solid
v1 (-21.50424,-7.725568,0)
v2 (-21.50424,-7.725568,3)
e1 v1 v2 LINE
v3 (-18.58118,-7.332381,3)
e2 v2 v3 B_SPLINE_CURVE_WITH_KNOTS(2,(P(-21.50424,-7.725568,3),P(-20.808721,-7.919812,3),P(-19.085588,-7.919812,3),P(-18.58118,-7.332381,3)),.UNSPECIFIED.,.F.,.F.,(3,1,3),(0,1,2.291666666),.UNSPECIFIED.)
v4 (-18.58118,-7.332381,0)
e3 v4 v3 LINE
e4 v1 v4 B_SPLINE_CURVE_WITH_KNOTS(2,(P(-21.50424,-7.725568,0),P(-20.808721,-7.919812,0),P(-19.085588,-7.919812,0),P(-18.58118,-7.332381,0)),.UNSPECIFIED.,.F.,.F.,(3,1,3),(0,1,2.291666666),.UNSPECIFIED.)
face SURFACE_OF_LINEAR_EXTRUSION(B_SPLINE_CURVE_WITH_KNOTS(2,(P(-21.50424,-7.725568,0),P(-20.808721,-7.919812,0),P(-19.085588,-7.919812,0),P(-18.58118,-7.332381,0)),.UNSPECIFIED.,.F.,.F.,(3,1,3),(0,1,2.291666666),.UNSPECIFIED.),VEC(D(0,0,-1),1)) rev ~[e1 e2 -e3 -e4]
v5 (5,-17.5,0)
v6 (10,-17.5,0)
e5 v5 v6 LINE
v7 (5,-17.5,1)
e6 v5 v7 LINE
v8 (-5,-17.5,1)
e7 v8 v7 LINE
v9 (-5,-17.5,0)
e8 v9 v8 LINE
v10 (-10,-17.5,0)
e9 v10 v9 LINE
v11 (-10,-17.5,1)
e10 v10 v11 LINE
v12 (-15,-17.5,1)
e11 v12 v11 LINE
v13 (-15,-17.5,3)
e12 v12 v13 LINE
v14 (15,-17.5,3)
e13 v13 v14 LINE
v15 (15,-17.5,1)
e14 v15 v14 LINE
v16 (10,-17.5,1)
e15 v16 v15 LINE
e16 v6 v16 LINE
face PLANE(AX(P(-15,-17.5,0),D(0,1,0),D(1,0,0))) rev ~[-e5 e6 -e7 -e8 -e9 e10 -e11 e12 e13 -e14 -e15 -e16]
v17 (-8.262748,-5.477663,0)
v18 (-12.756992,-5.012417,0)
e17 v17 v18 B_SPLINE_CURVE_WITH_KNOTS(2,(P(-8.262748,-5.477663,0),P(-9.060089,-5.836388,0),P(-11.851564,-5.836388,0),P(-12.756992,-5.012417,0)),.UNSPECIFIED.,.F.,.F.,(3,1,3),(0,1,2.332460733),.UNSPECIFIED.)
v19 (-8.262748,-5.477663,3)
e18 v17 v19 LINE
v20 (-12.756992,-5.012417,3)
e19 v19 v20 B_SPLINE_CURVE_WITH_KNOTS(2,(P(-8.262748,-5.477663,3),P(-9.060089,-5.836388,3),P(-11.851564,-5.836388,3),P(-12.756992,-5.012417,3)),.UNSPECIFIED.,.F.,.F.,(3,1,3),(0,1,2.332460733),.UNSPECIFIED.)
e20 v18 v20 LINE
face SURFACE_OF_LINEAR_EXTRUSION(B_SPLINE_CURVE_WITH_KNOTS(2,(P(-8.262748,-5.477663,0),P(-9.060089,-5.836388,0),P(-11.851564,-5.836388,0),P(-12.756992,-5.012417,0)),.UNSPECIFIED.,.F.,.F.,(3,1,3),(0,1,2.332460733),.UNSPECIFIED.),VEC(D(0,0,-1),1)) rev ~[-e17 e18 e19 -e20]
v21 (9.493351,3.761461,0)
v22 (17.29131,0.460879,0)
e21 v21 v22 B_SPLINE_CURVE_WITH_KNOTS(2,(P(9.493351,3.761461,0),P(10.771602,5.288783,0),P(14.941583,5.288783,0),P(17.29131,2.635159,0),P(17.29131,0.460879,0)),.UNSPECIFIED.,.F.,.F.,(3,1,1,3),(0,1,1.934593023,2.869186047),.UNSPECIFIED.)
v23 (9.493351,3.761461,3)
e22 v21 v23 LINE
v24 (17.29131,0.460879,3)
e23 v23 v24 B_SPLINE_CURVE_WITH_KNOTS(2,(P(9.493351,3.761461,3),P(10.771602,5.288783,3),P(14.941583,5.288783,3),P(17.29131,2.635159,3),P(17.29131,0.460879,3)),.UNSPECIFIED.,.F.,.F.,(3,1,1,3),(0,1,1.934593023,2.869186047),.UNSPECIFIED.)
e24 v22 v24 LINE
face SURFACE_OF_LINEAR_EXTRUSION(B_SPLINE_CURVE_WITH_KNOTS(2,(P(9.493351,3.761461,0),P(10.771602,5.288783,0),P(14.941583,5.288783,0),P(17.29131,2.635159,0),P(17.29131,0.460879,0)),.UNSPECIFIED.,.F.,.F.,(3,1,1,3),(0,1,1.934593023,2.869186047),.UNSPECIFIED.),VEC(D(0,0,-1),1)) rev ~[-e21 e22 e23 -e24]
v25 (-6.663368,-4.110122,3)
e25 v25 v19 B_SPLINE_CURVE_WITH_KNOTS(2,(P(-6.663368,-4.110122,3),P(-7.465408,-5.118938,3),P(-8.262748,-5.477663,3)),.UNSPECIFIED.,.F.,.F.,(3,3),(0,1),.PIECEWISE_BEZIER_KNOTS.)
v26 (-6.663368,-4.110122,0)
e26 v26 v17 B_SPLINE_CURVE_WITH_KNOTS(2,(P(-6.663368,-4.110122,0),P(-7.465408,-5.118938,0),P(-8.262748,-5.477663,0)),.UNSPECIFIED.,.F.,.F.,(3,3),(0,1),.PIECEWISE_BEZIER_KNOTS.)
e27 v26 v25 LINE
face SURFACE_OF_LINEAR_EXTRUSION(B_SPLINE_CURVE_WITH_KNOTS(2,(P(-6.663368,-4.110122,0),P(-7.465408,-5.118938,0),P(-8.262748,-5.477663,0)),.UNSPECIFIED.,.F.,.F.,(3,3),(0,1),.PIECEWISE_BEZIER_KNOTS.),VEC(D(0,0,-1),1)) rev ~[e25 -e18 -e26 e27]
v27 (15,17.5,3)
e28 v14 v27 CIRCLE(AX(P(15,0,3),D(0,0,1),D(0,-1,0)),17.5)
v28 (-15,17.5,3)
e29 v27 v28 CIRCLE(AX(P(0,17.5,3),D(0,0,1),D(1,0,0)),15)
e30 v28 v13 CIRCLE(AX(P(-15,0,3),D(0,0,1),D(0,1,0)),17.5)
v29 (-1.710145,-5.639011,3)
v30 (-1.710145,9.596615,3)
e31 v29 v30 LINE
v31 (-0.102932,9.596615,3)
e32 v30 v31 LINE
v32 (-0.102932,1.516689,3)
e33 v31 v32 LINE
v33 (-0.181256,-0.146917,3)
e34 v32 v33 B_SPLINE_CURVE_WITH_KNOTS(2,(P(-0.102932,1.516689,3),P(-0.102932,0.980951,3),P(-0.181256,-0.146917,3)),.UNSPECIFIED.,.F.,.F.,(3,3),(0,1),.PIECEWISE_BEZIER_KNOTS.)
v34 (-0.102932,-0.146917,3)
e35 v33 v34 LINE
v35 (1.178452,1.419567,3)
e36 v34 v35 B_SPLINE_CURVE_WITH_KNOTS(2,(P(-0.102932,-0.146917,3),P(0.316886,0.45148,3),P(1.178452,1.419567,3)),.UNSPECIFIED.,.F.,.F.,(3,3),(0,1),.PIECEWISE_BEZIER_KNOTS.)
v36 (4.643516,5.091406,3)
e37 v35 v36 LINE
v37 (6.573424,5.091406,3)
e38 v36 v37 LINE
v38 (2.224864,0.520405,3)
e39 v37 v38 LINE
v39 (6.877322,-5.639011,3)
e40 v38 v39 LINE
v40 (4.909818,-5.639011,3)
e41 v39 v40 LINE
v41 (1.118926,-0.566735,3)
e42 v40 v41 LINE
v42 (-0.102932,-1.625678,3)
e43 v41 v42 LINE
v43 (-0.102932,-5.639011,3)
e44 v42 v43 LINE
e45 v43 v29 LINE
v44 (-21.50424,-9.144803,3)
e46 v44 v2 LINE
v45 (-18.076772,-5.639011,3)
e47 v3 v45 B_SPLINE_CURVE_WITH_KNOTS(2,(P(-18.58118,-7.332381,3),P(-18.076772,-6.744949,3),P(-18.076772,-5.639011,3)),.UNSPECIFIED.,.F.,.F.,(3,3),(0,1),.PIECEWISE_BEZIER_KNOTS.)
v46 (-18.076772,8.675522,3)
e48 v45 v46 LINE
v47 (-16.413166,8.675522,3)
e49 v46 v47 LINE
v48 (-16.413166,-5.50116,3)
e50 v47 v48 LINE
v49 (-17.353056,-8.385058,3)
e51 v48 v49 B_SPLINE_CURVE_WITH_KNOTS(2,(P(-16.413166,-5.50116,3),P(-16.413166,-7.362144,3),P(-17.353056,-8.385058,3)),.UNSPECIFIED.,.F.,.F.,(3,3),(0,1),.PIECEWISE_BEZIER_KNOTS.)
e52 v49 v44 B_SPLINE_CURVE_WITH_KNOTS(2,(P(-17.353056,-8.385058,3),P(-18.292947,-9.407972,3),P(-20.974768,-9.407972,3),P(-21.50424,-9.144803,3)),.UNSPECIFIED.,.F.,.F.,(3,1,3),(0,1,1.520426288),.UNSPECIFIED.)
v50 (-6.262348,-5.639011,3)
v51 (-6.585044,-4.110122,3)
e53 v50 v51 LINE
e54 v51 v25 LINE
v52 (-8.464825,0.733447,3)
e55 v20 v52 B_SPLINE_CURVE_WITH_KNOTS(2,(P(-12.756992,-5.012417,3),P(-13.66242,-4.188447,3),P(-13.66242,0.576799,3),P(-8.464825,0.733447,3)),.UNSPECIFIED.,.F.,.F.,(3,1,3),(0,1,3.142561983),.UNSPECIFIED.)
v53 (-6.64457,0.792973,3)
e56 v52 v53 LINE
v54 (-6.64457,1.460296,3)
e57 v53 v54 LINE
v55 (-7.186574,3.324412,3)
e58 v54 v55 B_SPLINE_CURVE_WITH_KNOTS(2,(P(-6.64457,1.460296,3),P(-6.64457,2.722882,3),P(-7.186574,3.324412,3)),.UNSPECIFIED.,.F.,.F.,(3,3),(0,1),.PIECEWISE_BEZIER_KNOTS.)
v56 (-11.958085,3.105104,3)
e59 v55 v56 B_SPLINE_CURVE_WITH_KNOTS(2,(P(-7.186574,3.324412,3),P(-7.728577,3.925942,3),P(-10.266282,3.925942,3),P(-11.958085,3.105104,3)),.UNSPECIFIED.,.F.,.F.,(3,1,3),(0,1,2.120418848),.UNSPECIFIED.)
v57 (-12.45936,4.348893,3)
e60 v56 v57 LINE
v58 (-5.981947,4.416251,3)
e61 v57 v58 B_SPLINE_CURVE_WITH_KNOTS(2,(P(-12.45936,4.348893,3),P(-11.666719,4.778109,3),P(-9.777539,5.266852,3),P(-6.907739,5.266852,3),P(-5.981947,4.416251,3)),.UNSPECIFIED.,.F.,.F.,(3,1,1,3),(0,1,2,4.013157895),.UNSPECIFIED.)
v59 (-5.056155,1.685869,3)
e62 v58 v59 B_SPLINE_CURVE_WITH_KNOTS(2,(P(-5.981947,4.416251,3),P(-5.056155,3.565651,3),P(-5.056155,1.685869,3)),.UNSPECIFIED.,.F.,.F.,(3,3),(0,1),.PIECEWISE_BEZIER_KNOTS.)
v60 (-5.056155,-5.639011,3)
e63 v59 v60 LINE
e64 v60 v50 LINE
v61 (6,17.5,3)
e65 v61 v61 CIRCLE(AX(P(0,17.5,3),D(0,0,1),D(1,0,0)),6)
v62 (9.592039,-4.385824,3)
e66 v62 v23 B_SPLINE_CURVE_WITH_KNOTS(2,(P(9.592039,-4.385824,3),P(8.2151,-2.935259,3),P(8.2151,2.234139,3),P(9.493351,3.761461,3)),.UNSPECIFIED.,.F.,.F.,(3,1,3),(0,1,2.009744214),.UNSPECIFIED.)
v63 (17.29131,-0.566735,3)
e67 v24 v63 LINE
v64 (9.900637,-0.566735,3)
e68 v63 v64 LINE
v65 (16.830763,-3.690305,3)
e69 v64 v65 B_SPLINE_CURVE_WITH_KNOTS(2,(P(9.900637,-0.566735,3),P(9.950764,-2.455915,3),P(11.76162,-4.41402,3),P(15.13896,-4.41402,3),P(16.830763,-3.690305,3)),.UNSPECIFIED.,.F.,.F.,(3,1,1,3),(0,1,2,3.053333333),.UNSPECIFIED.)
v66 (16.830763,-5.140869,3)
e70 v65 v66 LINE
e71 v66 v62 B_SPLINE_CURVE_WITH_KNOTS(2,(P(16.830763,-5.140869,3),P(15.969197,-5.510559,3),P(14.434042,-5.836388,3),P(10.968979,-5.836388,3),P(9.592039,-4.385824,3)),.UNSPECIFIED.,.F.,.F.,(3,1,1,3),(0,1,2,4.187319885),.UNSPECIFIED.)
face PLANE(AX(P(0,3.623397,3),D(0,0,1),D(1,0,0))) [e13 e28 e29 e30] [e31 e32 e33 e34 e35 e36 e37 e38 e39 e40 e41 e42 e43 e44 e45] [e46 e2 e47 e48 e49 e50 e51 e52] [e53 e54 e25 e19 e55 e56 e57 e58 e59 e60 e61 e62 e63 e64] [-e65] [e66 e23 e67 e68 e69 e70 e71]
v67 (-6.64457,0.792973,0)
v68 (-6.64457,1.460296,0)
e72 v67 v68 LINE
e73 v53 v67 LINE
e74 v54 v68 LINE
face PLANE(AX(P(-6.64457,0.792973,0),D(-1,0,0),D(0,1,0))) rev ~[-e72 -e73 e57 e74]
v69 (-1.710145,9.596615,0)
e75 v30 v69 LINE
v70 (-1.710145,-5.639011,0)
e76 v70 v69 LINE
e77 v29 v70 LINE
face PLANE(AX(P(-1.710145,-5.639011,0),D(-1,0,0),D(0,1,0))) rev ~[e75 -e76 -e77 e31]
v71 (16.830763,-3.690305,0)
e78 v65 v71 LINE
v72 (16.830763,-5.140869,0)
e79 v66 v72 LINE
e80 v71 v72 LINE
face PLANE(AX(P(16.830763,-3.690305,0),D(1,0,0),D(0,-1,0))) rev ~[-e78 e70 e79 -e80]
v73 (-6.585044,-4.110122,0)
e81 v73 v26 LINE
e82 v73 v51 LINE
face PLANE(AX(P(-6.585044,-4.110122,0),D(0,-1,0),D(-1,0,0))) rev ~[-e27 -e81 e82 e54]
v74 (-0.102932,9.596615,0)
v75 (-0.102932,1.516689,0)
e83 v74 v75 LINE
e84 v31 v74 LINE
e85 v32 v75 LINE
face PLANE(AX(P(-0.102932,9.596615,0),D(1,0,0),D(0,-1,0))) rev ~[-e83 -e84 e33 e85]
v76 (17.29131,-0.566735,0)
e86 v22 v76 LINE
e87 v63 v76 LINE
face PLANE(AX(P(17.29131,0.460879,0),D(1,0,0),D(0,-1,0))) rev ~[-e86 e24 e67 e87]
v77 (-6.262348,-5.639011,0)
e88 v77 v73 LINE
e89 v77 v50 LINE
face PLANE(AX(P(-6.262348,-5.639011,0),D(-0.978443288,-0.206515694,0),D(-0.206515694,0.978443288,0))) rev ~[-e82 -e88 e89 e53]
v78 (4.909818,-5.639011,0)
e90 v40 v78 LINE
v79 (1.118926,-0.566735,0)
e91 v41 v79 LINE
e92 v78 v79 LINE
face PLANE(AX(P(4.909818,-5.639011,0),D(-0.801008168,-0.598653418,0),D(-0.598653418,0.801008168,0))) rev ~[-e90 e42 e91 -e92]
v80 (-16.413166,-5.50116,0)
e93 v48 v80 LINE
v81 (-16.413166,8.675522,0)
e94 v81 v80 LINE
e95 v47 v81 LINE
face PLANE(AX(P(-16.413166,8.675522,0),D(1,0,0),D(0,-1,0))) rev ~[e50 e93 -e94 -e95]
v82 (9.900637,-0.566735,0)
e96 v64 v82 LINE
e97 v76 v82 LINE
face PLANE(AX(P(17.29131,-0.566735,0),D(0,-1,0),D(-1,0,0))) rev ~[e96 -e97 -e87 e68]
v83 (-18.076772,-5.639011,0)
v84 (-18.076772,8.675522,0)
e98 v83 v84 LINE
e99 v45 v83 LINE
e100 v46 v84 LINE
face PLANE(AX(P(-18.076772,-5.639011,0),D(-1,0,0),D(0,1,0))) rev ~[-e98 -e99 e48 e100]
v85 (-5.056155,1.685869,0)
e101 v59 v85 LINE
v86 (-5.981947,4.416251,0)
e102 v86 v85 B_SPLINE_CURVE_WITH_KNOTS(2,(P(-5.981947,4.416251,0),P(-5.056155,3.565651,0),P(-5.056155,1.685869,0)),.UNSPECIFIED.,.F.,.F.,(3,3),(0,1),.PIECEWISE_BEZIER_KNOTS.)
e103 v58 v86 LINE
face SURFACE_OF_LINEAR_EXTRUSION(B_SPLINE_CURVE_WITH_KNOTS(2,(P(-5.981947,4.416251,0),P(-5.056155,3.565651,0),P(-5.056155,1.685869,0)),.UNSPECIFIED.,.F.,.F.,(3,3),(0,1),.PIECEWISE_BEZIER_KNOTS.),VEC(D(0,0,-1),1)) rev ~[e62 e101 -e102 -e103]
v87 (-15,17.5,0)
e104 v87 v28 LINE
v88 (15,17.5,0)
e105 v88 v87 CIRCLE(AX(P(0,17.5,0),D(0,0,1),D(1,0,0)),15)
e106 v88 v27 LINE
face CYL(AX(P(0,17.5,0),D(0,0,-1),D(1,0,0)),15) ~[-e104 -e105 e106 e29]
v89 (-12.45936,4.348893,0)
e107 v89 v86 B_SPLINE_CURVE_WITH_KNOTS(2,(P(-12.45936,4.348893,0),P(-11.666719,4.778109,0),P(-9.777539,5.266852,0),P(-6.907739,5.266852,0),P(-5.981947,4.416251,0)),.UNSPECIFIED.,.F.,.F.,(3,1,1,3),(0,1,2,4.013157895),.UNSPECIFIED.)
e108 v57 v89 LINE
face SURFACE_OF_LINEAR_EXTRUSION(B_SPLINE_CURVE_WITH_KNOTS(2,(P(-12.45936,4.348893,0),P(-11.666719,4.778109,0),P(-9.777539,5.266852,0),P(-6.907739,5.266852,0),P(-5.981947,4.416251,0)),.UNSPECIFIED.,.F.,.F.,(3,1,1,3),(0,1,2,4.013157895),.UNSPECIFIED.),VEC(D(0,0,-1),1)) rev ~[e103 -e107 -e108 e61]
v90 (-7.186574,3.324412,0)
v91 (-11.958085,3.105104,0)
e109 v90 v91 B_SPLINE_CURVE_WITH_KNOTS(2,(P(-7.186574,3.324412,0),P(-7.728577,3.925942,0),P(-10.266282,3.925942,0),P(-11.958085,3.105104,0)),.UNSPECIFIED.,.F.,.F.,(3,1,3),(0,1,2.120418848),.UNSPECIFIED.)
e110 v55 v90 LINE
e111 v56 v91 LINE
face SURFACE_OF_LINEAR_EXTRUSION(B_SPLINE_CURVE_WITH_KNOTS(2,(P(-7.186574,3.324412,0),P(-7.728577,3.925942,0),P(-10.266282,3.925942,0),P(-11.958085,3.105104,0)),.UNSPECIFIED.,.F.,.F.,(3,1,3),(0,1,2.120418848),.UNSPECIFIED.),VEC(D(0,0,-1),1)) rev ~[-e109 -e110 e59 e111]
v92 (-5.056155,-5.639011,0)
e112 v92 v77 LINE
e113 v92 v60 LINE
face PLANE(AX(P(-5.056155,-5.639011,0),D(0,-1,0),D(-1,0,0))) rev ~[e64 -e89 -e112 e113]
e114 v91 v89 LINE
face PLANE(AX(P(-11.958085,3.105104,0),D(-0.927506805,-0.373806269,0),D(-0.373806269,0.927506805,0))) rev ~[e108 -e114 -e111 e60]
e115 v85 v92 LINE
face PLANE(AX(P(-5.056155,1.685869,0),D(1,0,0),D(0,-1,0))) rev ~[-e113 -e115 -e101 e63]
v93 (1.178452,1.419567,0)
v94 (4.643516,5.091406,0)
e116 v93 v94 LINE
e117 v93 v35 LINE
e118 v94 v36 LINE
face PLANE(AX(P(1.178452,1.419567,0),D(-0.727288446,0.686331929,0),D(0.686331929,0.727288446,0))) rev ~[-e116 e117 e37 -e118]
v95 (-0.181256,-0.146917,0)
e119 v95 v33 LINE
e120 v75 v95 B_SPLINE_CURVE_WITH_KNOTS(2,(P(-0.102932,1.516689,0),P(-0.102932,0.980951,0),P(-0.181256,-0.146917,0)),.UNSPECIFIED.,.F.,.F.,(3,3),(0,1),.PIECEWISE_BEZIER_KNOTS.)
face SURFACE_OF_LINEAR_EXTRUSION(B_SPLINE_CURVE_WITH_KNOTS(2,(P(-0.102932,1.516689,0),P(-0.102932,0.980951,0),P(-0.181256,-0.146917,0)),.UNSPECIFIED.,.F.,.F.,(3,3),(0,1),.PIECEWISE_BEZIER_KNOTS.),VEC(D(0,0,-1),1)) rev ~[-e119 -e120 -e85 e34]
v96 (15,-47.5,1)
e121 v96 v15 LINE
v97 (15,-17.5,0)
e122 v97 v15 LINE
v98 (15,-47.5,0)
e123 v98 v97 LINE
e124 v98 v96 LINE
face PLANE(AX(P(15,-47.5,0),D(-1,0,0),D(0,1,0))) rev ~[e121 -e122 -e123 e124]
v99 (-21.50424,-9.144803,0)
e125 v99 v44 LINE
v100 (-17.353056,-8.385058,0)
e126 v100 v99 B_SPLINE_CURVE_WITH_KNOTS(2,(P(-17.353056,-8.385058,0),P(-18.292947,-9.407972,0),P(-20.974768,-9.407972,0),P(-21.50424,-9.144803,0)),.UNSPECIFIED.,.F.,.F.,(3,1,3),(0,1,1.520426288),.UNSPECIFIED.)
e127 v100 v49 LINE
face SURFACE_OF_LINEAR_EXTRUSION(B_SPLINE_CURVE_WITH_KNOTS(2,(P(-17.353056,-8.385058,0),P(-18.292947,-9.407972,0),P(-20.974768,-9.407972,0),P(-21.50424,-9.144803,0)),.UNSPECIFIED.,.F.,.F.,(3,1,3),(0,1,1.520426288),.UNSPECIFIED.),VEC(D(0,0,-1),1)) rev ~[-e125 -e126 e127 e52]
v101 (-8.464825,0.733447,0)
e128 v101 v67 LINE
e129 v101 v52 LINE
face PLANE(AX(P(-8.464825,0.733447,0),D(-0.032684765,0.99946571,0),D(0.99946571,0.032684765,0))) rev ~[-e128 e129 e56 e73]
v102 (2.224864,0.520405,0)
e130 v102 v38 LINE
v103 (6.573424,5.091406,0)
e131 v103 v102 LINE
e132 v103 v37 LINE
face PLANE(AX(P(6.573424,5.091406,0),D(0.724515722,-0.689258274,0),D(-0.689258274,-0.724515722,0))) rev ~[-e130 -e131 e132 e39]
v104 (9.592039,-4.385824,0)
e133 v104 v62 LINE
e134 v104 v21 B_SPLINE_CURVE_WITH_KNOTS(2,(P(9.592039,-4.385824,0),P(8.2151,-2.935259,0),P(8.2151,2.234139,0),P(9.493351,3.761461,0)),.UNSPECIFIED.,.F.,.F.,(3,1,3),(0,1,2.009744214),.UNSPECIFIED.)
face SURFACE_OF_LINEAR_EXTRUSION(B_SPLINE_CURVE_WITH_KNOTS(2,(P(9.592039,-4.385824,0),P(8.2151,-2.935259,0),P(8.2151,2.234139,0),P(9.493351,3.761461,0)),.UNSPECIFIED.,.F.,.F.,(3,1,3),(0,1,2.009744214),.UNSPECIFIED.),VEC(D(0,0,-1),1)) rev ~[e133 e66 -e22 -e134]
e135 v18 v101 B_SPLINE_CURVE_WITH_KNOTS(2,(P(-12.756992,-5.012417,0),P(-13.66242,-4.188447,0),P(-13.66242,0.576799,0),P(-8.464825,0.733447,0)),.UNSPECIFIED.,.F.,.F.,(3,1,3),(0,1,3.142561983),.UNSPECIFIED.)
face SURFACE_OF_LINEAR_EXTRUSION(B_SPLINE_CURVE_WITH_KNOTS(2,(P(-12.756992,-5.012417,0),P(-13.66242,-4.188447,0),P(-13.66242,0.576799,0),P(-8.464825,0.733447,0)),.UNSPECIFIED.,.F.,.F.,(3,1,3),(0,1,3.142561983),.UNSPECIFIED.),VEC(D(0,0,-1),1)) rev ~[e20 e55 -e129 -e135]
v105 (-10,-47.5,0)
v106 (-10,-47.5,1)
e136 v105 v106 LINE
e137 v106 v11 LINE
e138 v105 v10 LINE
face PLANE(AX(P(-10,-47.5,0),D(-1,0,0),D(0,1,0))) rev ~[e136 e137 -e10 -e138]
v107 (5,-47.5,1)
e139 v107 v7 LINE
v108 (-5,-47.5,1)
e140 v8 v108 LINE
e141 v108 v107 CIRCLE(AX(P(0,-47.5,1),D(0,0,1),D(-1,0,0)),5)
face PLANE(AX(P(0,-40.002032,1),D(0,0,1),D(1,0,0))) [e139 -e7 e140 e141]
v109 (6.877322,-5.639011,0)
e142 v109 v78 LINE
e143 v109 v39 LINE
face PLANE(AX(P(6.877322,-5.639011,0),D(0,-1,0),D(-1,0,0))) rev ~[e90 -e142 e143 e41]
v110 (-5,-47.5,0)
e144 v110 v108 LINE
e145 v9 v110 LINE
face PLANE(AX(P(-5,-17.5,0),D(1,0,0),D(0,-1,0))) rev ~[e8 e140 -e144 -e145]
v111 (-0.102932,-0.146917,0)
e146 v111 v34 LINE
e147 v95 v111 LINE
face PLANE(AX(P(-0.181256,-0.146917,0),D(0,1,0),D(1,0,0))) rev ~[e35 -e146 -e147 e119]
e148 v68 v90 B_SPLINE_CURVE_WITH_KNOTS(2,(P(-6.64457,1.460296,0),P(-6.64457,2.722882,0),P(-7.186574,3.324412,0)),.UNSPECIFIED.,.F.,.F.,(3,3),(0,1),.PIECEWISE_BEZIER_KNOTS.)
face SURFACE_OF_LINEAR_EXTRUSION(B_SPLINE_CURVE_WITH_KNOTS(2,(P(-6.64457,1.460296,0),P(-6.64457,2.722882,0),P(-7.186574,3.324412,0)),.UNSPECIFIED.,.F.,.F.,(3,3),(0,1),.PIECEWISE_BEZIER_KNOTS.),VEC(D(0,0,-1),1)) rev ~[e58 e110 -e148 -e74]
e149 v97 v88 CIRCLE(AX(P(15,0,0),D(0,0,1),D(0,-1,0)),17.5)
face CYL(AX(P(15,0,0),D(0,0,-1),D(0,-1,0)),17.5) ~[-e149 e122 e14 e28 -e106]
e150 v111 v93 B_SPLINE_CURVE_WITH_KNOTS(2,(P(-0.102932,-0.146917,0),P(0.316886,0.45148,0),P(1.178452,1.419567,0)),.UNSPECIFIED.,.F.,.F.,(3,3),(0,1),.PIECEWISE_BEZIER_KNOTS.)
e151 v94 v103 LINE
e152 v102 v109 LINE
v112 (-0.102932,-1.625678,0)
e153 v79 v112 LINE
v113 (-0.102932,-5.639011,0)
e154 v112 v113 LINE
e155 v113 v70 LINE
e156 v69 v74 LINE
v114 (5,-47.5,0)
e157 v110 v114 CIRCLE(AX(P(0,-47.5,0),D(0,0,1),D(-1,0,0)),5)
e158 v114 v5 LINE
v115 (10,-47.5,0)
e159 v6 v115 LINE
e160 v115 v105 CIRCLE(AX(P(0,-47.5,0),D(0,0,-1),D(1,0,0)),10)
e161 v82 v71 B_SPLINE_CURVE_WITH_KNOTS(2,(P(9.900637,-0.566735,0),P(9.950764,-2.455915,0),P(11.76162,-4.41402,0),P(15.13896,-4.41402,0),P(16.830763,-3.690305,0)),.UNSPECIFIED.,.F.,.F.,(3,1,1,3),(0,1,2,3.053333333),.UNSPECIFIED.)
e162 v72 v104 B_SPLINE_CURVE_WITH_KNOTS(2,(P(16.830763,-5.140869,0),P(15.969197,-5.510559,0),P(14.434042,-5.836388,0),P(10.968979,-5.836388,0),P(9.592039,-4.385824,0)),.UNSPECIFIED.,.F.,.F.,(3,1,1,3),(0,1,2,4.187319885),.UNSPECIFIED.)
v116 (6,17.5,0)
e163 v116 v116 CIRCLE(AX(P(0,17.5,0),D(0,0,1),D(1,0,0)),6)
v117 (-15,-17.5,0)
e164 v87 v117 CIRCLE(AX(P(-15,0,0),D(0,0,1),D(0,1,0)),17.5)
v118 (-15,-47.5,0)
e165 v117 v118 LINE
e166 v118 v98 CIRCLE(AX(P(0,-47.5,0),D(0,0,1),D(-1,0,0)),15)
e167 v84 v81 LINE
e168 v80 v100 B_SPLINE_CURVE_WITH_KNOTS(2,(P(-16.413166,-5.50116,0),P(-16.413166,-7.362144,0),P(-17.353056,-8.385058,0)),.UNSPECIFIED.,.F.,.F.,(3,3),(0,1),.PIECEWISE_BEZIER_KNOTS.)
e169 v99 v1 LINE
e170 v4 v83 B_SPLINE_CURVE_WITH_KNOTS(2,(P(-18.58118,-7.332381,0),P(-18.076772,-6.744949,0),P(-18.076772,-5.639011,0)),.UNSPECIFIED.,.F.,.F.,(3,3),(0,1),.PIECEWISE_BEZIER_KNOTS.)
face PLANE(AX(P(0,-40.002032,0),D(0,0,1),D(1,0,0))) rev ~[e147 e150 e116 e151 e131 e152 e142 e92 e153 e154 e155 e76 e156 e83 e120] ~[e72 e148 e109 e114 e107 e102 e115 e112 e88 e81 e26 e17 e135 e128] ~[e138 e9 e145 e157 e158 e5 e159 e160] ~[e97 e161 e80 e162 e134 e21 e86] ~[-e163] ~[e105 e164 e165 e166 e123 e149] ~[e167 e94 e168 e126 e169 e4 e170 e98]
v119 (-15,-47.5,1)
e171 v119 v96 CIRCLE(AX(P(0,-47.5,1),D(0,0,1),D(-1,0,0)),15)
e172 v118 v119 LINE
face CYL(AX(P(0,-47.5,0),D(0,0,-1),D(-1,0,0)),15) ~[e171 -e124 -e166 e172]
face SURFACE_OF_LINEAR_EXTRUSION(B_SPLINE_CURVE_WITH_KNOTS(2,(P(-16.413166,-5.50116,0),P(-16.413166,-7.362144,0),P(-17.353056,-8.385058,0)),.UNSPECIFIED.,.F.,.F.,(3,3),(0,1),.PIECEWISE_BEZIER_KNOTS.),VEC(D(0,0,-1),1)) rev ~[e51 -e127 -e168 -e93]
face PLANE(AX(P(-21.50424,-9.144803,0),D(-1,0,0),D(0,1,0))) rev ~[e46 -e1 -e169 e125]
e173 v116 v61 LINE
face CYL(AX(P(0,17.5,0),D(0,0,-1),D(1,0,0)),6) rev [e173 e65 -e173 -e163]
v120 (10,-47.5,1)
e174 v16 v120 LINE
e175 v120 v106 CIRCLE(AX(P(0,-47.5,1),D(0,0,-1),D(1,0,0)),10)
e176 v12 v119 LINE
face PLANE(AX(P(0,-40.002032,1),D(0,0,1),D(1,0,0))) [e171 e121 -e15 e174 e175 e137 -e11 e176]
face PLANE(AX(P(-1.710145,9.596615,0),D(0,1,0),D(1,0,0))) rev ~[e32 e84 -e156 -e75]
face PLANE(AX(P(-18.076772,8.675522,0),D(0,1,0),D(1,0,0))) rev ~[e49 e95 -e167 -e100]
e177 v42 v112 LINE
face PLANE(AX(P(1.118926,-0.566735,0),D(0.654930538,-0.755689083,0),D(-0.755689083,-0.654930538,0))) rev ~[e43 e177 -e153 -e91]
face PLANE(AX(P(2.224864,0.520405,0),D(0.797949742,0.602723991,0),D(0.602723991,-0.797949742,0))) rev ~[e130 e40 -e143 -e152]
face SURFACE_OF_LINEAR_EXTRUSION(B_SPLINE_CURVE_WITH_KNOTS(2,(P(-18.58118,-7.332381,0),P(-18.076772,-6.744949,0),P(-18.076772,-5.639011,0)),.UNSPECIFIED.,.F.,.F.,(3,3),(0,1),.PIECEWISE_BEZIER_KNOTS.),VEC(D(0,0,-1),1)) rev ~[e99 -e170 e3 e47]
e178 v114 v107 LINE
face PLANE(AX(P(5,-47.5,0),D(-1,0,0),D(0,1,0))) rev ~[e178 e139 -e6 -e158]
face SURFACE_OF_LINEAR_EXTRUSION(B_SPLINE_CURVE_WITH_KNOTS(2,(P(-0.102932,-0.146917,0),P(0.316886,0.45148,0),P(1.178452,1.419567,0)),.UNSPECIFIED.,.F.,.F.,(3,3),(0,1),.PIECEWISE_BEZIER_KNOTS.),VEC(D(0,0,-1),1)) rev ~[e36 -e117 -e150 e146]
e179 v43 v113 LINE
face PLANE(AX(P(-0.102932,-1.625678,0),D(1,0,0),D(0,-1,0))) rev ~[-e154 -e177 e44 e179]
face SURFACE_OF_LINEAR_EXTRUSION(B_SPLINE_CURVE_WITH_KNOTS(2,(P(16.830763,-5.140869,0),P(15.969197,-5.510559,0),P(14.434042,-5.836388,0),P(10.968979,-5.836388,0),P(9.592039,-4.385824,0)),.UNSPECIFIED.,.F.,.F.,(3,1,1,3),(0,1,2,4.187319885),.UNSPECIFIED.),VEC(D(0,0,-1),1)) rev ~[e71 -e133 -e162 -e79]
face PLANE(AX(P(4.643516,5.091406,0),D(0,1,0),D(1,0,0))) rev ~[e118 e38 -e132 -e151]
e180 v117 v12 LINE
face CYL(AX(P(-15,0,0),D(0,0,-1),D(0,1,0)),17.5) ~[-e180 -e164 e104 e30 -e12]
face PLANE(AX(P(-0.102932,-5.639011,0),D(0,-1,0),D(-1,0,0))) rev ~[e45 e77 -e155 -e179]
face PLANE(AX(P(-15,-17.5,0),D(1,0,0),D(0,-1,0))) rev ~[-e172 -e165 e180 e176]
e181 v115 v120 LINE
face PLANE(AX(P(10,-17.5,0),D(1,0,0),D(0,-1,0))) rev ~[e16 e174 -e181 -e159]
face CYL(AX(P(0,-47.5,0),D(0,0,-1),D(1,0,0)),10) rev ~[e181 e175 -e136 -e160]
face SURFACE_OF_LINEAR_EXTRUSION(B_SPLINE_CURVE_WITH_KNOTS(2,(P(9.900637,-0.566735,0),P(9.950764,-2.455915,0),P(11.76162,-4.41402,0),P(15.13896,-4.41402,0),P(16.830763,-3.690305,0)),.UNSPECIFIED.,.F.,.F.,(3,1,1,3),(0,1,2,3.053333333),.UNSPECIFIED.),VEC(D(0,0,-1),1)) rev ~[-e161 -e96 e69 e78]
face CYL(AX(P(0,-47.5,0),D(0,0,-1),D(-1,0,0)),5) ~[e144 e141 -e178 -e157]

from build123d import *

# Parameters (mm, degrees)
F0_R     = 6
F1_DEPTH = 3
F2_DEPTH = 1


with BuildPart() as f1:
    # F0 (on Top) → F1 (new body)
    with BuildSketch(Plane.XY):
        with BuildLine():
            Line((10, -17.5), (15, -17.5))
            ThreePointArc((15, -17.5), (32.5, 0), (15, 17.5))
            ThreePointArc((15, 17.5), (0, 32.5), (-15, 17.5))
            ThreePointArc((-15, 17.5), (-32.5, 0), (-15, -17.5))
            Line((-15, -17.5), (-10, -17.5))
            Line((-10, -17.5), (-5, -17.5))
            Line((-5, -17.5), (5, -17.5))
            Line((5, -17.5), (10, -17.5))
        make_face()
        with BuildLine():
            add(Edge.make_bspline(
                [(-17.3530564989, -8.385057961), (-18.2929470593, -9.4079721875), (-20.0568083443, -9.4079721875)],
                knots=[0, 0, 0, 1, 1, 1], degree=2))
            add(Edge.make_bspline(
                [(-20.0568083443, -9.4079721875), (-20.974768125, -9.4079721875), (-21.5042398074, -9.1448028306)],
                knots=[0, 0, 0, 1, 1, 1], degree=2))
            Line((-21.5042398074, -9.1448028306), (-21.5042398074, -7.7255680844))
            add(Edge.make_bspline(
                [(-21.5042398074, -7.7255680844), (-20.8087207927, -7.9198121336), (-20.0568083443, -7.9198121336)],
                knots=[0, 0, 0, 1, 1, 1], degree=2))
            add(Edge.make_bspline(
                [(-20.0568083443, -7.9198121336), (-19.0855880986, -7.9198121336), (-18.5811801645, -7.3323805333)],
                knots=[0, 0, 0, 1, 1, 1], degree=2))
            add(Edge.make_bspline(
                [(-18.5811801645, -7.3323805333), (-18.0767722304, -6.7449489331), (-18.0767722304, -5.6390110403)],
                knots=[0, 0, 0, 1, 1, 1], degree=2))
            Line((-18.0767722304, -5.6390110403), (-18.0767722304, 8.6755221946))
            Line((-18.0767722304, 8.6755221946), (-16.4131659385, 8.6755221946))
            Line((-16.4131659385, 8.6755221946), (-16.4131659385, -5.5011604248))
            add(Edge.make_bspline(
                [(-16.4131659385, -5.5011604248), (-16.4131659385, -7.3621437344), (-17.3530564989, -8.385057961)],
                knots=[0, 0, 0, 1, 1, 1], degree=2))
        make_face(mode=Mode.SUBTRACT)
        with BuildLine():
            Line((-5.0561550003, -5.6390110403), (-6.2623478861, -5.6390110403))
            Line((-6.2623478861, -5.6390110403), (-6.5850436452, -4.1101223954))
            Line((-6.5850436452, -4.1101223954), (-6.6633678586, -4.1101223954))
            add(Edge.make_bspline(
                [(-6.6633678586, -4.1101223954), (-7.4654078035, -5.1189382636), (-8.2627482955, -5.4776631608)],
                knots=[0, 0, 0, 1, 1, 1], degree=2))
            add(Edge.make_bspline(
                [(-8.2627482955, -5.4776631608), (-9.0600887876, -5.836388058), (-10.2568827679, -5.836388058)],
                knots=[0, 0, 0, 1, 1, 1], degree=2))
            add(Edge.make_bspline(
                [(-10.2568827679, -5.836388058), (-11.851563752, -5.836388058), (-12.7569916585, -5.0124173334)],
                knots=[0, 0, 0, 1, 1, 1], degree=2))
            add(Edge.make_bspline(
                [(-12.7569916585, -5.0124173334), (-13.6624195651, -4.1884466088), (-13.6624195651, -2.672089838)],
                knots=[0, 0, 0, 1, 1, 1], degree=2))
            add(Edge.make_bspline(
                [(-13.6624195651, -2.672089838), (-13.6624195651, 0.5767985325), (-8.464824766, 0.7334469592)],
                knots=[0, 0, 0, 1, 1, 1], degree=2))
            Line((-8.464824766, 0.7334469592), (-6.6445700474, 0.7929733614))
            Line((-6.6445700474, 0.7929733614), (-6.6445700474, 1.4602956592))
            add(Edge.make_bspline(
                [(-6.6445700474, 1.4602956592), (-6.6445700474, 2.7228819787), (-7.1865736039, 3.3244119374)],
                knots=[0, 0, 0, 1, 1, 1], degree=2))
            add(Edge.make_bspline(
                [(-7.1865736039, 3.3244119374), (-7.7285771604, 3.925941896), (-8.9253711406, 3.925941896)],
                knots=[0, 0, 0, 1, 1, 1], degree=2))
            add(Edge.make_bspline(
                [(-8.9253711406, 3.925941896), (-10.2662816735, 3.925941896), (-11.9580846822, 3.10510414)],
                knots=[0, 0, 0, 1, 1, 1], degree=2))
            Line((-11.9580846822, 3.10510414), (-12.4593596477, 4.3488926482))
            add(Edge.make_bspline(
                [(-12.4593596477, 4.3488926482), (-11.6667186085, 4.7781093375), (-10.7221285953, 5.0224808832)],
                knots=[0, 0, 0, 1, 1, 1], degree=2))
            add(Edge.make_bspline(
                [(-10.7221285953, 5.0224808832), (-9.7775385821, 5.2668524289), (-8.8251161475, 5.2668524289)],
                knots=[0, 0, 0, 1, 1, 1], degree=2))
            add(Edge.make_bspline(
                [(-8.8251161475, 5.2668524289), (-6.9077394043, 5.2668524289), (-5.9819472023, 4.4162514717)],
                knots=[0, 0, 0, 1, 1, 1], degree=2))
            add(Edge.make_bspline(
                [(-5.9819472023, 4.4162514717), (-5.0561550003, 3.5656505146), (-5.0561550003, 1.6858693937)],
                knots=[0, 0, 0, 1, 1, 1], degree=2))
            Line((-5.0561550003, 1.6858693937), (-5.0561550003, -5.6390110403))
        make_face(mode=Mode.SUBTRACT)
        with BuildLine():
            Line((-0.1812559603, -0.146917199), (-0.102931747, -0.146917199))
            add(Edge.make_bspline(
                [(-0.102931747, -0.146917199), (0.3168860367, 0.4514797911), (1.1784523837, 1.4195670683)],
                knots=[0, 0, 0, 1, 1, 1], degree=2))
            Line((1.1784523837, 1.4195670683), (4.6435155831, 5.0914061909))
            Line((4.6435155831, 5.0914061909), (6.5734242004, 5.0914061909))
            Line((6.5734242004, 5.0914061909), (2.2248638743, 0.5204050988))
            Line((2.2248638743, 0.5204050988), (6.8773221483, -5.6390110403))
            Line((6.8773221483, -5.6390110403), (4.9098179085, -5.6390110403))
            Line((4.9098179085, -5.6390110403), (1.1189259815, -0.5667349827))
            Line((1.1189259815, -0.5667349827), (-0.102931747, -1.6256783474))
            Line((-0.102931747, -1.6256783474), (-0.102931747, -5.6390110403))
            Line((-0.102931747, -5.6390110403), (-1.7101446053, -5.6390110403))
            Line((-1.7101446053, -5.6390110403), (-1.7101446053, 9.5966149438))
            Line((-1.7101446053, 9.5966149438), (-0.102931747, 9.5966149438))
            Line((-0.102931747, 9.5966149438), (-0.102931747, 1.5166890929))
            add(Edge.make_bspline(
                [(-0.102931747, 1.5166890929), (-0.102931747, 0.9809514734), (-0.1812559603, -0.146917199)],
                knots=[0, 0, 0, 1, 1, 1], degree=2))
        make_face(mode=Mode.SUBTRACT)
        with BuildLine():
            add(Edge.make_bspline(
                [(15.2016195449, -5.6734736942), (14.4340422539, -5.836388058), (13.3469021724, -5.836388058)],
                knots=[0, 0, 0, 1, 1, 1], degree=2))
            add(Edge.make_bspline(
                [(13.3469021724, -5.836388058), (10.9689790546, -5.836388058), (9.5920393836, -4.3858236265)],
                knots=[0, 0, 0, 1, 1, 1], degree=2))
            add(Edge.make_bspline(
                [(9.5920393836, -4.3858236265), (8.2150997126, -2.9352591949), (8.2150997126, -0.3630920279)],
                knots=[0, 0, 0, 1, 1, 1], degree=2))
            add(Edge.make_bspline(
                [(8.2150997126, -0.3630920279), (8.2150997126, 2.2341388873), (9.4933508747, 3.761461048)],
                knots=[0, 0, 0, 1, 1, 1], degree=2))
            add(Edge.make_bspline(
                [(9.4933508747, 3.761461048), (10.7716020369, 5.2887832086), (12.9270843887, 5.2887832086)],
                knots=[0, 0, 0, 1, 1, 1], degree=2))
            add(Edge.make_bspline(
                [(12.9270843887, 5.2887832086), (14.9415831565, 5.2887832086), (16.116446357, 3.9619710342)],
                knots=[0, 0, 0, 1, 1, 1], degree=2))
            add(Edge.make_bspline(
                [(16.116446357, 3.9619710342), (17.2913095575, 2.6351588598), (17.2913095575, 0.4608786967)],
                knots=[0, 0, 0, 1, 1, 1], degree=2))
            Line((17.2913095575, 0.4608786967), (17.2913095575, -0.5667349827))
            Line((17.2913095575, -0.5667349827), (9.9006367842, -0.5667349827))
            add(Edge.make_bspline(
                [(9.9006367842, -0.5667349827), (9.9507642808, -2.4559150091), (10.8561921873, -3.4349676762)],
                knots=[0, 0, 0, 1, 1, 1], degree=2))
            add(Edge.make_bspline(
                [(10.8561921873, -3.4349676762), (11.7616200938, -4.4140203433), (13.4064285746, -4.4140203433)],
                knots=[0, 0, 0, 1, 1, 1], degree=2))
            add(Edge.make_bspline(
                [(13.4064285746, -4.4140203433), (15.1389601742, -4.4140203433), (16.830763183, -3.6903046118)],
                knots=[0, 0, 0, 1, 1, 1], degree=2))
            Line((16.830763183, -3.6903046118), (16.830763183, -5.1408690433))
            add(Edge.make_bspline(
                [(16.830763183, -5.1408690433), (15.9691968359, -5.5105593304), (15.2016195449, -5.6734736942)],
                knots=[0, 0, 0, 1, 1, 1], degree=2))
        make_face(mode=Mode.SUBTRACT)
        with Locations((0, 17.5)):
            Circle(F0_R, mode=Mode.SUBTRACT)
    extrude(amount=F1_DEPTH)

    # F0 (on Top) → F2 (join)
    with BuildSketch(Plane.XY):
        with BuildLine():
            Line((15, -47.5), (15, -17.5))
            Line((15, -17.5), (10, -17.5))
            Line((10, -17.5), (10, -47.5))
            ThreePointArc((10, -47.5), (0, -57.5), (-10, -47.5))
            Line((-10, -47.5), (-10, -17.5))
            Line((-10, -17.5), (-15, -17.5))
            Line((-15, -17.5), (-15, -47.5))
            ThreePointArc((-15, -47.5), (0, -62.5), (15, -47.5))
        make_face()
        with BuildLine():
            Line((10, -17.5), (15, -17.5))
            ThreePointArc((15, -17.5), (32.5, 0), (15, 17.5))
            ThreePointArc((15, 17.5), (0, 32.5), (-15, 17.5))
            ThreePointArc((-15, 17.5), (-32.5, 0), (-15, -17.5))
            Line((-15, -17.5), (-10, -17.5))
            Line((-10, -17.5), (-5, -17.5))
            Line((-5, -17.5), (5, -17.5))
            Line((5, -17.5), (10, -17.5))
        make_face()
        with BuildLine():
            add(Edge.make_bspline(
                [(-17.3530564989, -8.385057961), (-18.2929470593, -9.4079721875), (-20.0568083443, -9.4079721875)],
                knots=[0, 0, 0, 1, 1, 1], degree=2))
            add(Edge.make_bspline(
                [(-20.0568083443, -9.4079721875), (-20.974768125, -9.4079721875), (-21.5042398074, -9.1448028306)],
                knots=[0, 0, 0, 1, 1, 1], degree=2))
            Line((-21.5042398074, -9.1448028306), (-21.5042398074, -7.7255680844))
            add(Edge.make_bspline(
                [(-21.5042398074, -7.7255680844), (-20.8087207927, -7.9198121336), (-20.0568083443, -7.9198121336)],
                knots=[0, 0, 0, 1, 1, 1], degree=2))
            add(Edge.make_bspline(
                [(-20.0568083443, -7.9198121336), (-19.0855880986, -7.9198121336), (-18.5811801645, -7.3323805333)],
                knots=[0, 0, 0, 1, 1, 1], degree=2))
            add(Edge.make_bspline(
                [(-18.5811801645, -7.3323805333), (-18.0767722304, -6.7449489331), (-18.0767722304, -5.6390110403)],
                knots=[0, 0, 0, 1, 1, 1], degree=2))
            Line((-18.0767722304, -5.6390110403), (-18.0767722304, 8.6755221946))
            Line((-18.0767722304, 8.6755221946), (-16.4131659385, 8.6755221946))
            Line((-16.4131659385, 8.6755221946), (-16.4131659385, -5.5011604248))
            add(Edge.make_bspline(
                [(-16.4131659385, -5.5011604248), (-16.4131659385, -7.3621437344), (-17.3530564989, -8.385057961)],
                knots=[0, 0, 0, 1, 1, 1], degree=2))
        make_face(mode=Mode.SUBTRACT)
        with BuildLine():
            Line((-5.0561550003, -5.6390110403), (-6.2623478861, -5.6390110403))
            Line((-6.2623478861, -5.6390110403), (-6.5850436452, -4.1101223954))
            Line((-6.5850436452, -4.1101223954), (-6.6633678586, -4.1101223954))
            add(Edge.make_bspline(
                [(-6.6633678586, -4.1101223954), (-7.4654078035, -5.1189382636), (-8.2627482955, -5.4776631608)],
                knots=[0, 0, 0, 1, 1, 1], degree=2))
            add(Edge.make_bspline(
                [(-8.2627482955, -5.4776631608), (-9.0600887876, -5.836388058), (-10.2568827679, -5.836388058)],
                knots=[0, 0, 0, 1, 1, 1], degree=2))
            add(Edge.make_bspline(
                [(-10.2568827679, -5.836388058), (-11.851563752, -5.836388058), (-12.7569916585, -5.0124173334)],
                knots=[0, 0, 0, 1, 1, 1], degree=2))
            add(Edge.make_bspline(
                [(-12.7569916585, -5.0124173334), (-13.6624195651, -4.1884466088), (-13.6624195651, -2.672089838)],
                knots=[0, 0, 0, 1, 1, 1], degree=2))
            add(Edge.make_bspline(
                [(-13.6624195651, -2.672089838), (-13.6624195651, 0.5767985325), (-8.464824766, 0.7334469592)],
                knots=[0, 0, 0, 1, 1, 1], degree=2))
            Line((-8.464824766, 0.7334469592), (-6.6445700474, 0.7929733614))
            Line((-6.6445700474, 0.7929733614), (-6.6445700474, 1.4602956592))
            add(Edge.make_bspline(
                [(-6.6445700474, 1.4602956592), (-6.6445700474, 2.7228819787), (-7.1865736039, 3.3244119374)],
                knots=[0, 0, 0, 1, 1, 1], degree=2))
            add(Edge.make_bspline(
                [(-7.1865736039, 3.3244119374), (-7.7285771604, 3.925941896), (-8.9253711406, 3.925941896)],
                knots=[0, 0, 0, 1, 1, 1], degree=2))
            add(Edge.make_bspline(
                [(-8.9253711406, 3.925941896), (-10.2662816735, 3.925941896), (-11.9580846822, 3.10510414)],
                knots=[0, 0, 0, 1, 1, 1], degree=2))
            Line((-11.9580846822, 3.10510414), (-12.4593596477, 4.3488926482))
            add(Edge.make_bspline(
                [(-12.4593596477, 4.3488926482), (-11.6667186085, 4.7781093375), (-10.7221285953, 5.0224808832)],
                knots=[0, 0, 0, 1, 1, 1], degree=2))
            add(Edge.make_bspline(
                [(-10.7221285953, 5.0224808832), (-9.7775385821, 5.2668524289), (-8.8251161475, 5.2668524289)],
                knots=[0, 0, 0, 1, 1, 1], degree=2))
            add(Edge.make_bspline(
                [(-8.8251161475, 5.2668524289), (-6.9077394043, 5.2668524289), (-5.9819472023, 4.4162514717)],
                knots=[0, 0, 0, 1, 1, 1], degree=2))
            add(Edge.make_bspline(
                [(-5.9819472023, 4.4162514717), (-5.0561550003, 3.5656505146), (-5.0561550003, 1.6858693937)],
                knots=[0, 0, 0, 1, 1, 1], degree=2))
            Line((-5.0561550003, 1.6858693937), (-5.0561550003, -5.6390110403))
        make_face(mode=Mode.SUBTRACT)
        with BuildLine():
            Line((-0.1812559603, -0.146917199), (-0.102931747, -0.146917199))
            add(Edge.make_bspline(
                [(-0.102931747, -0.146917199), (0.3168860367, 0.4514797911), (1.1784523837, 1.4195670683)],
                knots=[0, 0, 0, 1, 1, 1], degree=2))
            Line((1.1784523837, 1.4195670683), (4.6435155831, 5.0914061909))
            Line((4.6435155831, 5.0914061909), (6.5734242004, 5.0914061909))
            Line((6.5734242004, 5.0914061909), (2.2248638743, 0.5204050988))
            Line((2.2248638743, 0.5204050988), (6.8773221483, -5.6390110403))
            Line((6.8773221483, -5.6390110403), (4.9098179085, -5.6390110403))
            Line((4.9098179085, -5.6390110403), (1.1189259815, -0.5667349827))
            Line((1.1189259815, -0.5667349827), (-0.102931747, -1.6256783474))
            Line((-0.102931747, -1.6256783474), (-0.102931747, -5.6390110403))
            Line((-0.102931747, -5.6390110403), (-1.7101446053, -5.6390110403))
            Line((-1.7101446053, -5.6390110403), (-1.7101446053, 9.5966149438))
            Line((-1.7101446053, 9.5966149438), (-0.102931747, 9.5966149438))
            Line((-0.102931747, 9.5966149438), (-0.102931747, 1.5166890929))
            add(Edge.make_bspline(
                [(-0.102931747, 1.5166890929), (-0.102931747, 0.9809514734), (-0.1812559603, -0.146917199)],
                knots=[0, 0, 0, 1, 1, 1], degree=2))
        make_face(mode=Mode.SUBTRACT)
        with BuildLine():
            add(Edge.make_bspline(
                [(15.2016195449, -5.6734736942), (14.4340422539, -5.836388058), (13.3469021724, -5.836388058)],
                knots=[0, 0, 0, 1, 1, 1], degree=2))
            add(Edge.make_bspline(
                [(13.3469021724, -5.836388058), (10.9689790546, -5.836388058), (9.5920393836, -4.3858236265)],
                knots=[0, 0, 0, 1, 1, 1], degree=2))
            add(Edge.make_bspline(
                [(9.5920393836, -4.3858236265), (8.2150997126, -2.9352591949), (8.2150997126, -0.3630920279)],
                knots=[0, 0, 0, 1, 1, 1], degree=2))
            add(Edge.make_bspline(
                [(8.2150997126, -0.3630920279), (8.2150997126, 2.2341388873), (9.4933508747, 3.761461048)],
                knots=[0, 0, 0, 1, 1, 1], degree=2))
            add(Edge.make_bspline(
                [(9.4933508747, 3.761461048), (10.7716020369, 5.2887832086), (12.9270843887, 5.2887832086)],
                knots=[0, 0, 0, 1, 1, 1], degree=2))
            add(Edge.make_bspline(
                [(12.9270843887, 5.2887832086), (14.9415831565, 5.2887832086), (16.116446357, 3.9619710342)],
                knots=[0, 0, 0, 1, 1, 1], degree=2))
            add(Edge.make_bspline(
                [(16.116446357, 3.9619710342), (17.2913095575, 2.6351588598), (17.2913095575, 0.4608786967)],
                knots=[0, 0, 0, 1, 1, 1], degree=2))
            Line((17.2913095575, 0.4608786967), (17.2913095575, -0.5667349827))
            Line((17.2913095575, -0.5667349827), (9.9006367842, -0.5667349827))
            add(Edge.make_bspline(
                [(9.9006367842, -0.5667349827), (9.9507642808, -2.4559150091), (10.8561921873, -3.4349676762)],
                knots=[0, 0, 0, 1, 1, 1], degree=2))
            add(Edge.make_bspline(
                [(10.8561921873, -3.4349676762), (11.7616200938, -4.4140203433), (13.4064285746, -4.4140203433)],
                knots=[0, 0, 0, 1, 1, 1], degree=2))
            add(Edge.make_bspline(
                [(13.4064285746, -4.4140203433), (15.1389601742, -4.4140203433), (16.830763183, -3.6903046118)],
                knots=[0, 0, 0, 1, 1, 1], degree=2))
            Line((16.830763183, -3.6903046118), (16.830763183, -5.1408690433))
            add(Edge.make_bspline(
                [(16.830763183, -5.1408690433), (15.9691968359, -5.5105593304), (15.2016195449, -5.6734736942)],
                knots=[0, 0, 0, 1, 1, 1], degree=2))
        make_face(mode=Mode.SUBTRACT)
        with Locations((0, 17.5)):
            Circle(F0_R, mode=Mode.SUBTRACT)
        with BuildLine():
            Line((5, -47.5), (5, -17.5))
            Line((5, -17.5), (-5, -17.5))
            Line((-5, -17.5), (-5, -47.5))
            ThreePointArc((-5, -47.5), (0, -52.5), (5, -47.5))
        make_face()
    extrude(amount=F2_DEPTH)


solid = f1.part
